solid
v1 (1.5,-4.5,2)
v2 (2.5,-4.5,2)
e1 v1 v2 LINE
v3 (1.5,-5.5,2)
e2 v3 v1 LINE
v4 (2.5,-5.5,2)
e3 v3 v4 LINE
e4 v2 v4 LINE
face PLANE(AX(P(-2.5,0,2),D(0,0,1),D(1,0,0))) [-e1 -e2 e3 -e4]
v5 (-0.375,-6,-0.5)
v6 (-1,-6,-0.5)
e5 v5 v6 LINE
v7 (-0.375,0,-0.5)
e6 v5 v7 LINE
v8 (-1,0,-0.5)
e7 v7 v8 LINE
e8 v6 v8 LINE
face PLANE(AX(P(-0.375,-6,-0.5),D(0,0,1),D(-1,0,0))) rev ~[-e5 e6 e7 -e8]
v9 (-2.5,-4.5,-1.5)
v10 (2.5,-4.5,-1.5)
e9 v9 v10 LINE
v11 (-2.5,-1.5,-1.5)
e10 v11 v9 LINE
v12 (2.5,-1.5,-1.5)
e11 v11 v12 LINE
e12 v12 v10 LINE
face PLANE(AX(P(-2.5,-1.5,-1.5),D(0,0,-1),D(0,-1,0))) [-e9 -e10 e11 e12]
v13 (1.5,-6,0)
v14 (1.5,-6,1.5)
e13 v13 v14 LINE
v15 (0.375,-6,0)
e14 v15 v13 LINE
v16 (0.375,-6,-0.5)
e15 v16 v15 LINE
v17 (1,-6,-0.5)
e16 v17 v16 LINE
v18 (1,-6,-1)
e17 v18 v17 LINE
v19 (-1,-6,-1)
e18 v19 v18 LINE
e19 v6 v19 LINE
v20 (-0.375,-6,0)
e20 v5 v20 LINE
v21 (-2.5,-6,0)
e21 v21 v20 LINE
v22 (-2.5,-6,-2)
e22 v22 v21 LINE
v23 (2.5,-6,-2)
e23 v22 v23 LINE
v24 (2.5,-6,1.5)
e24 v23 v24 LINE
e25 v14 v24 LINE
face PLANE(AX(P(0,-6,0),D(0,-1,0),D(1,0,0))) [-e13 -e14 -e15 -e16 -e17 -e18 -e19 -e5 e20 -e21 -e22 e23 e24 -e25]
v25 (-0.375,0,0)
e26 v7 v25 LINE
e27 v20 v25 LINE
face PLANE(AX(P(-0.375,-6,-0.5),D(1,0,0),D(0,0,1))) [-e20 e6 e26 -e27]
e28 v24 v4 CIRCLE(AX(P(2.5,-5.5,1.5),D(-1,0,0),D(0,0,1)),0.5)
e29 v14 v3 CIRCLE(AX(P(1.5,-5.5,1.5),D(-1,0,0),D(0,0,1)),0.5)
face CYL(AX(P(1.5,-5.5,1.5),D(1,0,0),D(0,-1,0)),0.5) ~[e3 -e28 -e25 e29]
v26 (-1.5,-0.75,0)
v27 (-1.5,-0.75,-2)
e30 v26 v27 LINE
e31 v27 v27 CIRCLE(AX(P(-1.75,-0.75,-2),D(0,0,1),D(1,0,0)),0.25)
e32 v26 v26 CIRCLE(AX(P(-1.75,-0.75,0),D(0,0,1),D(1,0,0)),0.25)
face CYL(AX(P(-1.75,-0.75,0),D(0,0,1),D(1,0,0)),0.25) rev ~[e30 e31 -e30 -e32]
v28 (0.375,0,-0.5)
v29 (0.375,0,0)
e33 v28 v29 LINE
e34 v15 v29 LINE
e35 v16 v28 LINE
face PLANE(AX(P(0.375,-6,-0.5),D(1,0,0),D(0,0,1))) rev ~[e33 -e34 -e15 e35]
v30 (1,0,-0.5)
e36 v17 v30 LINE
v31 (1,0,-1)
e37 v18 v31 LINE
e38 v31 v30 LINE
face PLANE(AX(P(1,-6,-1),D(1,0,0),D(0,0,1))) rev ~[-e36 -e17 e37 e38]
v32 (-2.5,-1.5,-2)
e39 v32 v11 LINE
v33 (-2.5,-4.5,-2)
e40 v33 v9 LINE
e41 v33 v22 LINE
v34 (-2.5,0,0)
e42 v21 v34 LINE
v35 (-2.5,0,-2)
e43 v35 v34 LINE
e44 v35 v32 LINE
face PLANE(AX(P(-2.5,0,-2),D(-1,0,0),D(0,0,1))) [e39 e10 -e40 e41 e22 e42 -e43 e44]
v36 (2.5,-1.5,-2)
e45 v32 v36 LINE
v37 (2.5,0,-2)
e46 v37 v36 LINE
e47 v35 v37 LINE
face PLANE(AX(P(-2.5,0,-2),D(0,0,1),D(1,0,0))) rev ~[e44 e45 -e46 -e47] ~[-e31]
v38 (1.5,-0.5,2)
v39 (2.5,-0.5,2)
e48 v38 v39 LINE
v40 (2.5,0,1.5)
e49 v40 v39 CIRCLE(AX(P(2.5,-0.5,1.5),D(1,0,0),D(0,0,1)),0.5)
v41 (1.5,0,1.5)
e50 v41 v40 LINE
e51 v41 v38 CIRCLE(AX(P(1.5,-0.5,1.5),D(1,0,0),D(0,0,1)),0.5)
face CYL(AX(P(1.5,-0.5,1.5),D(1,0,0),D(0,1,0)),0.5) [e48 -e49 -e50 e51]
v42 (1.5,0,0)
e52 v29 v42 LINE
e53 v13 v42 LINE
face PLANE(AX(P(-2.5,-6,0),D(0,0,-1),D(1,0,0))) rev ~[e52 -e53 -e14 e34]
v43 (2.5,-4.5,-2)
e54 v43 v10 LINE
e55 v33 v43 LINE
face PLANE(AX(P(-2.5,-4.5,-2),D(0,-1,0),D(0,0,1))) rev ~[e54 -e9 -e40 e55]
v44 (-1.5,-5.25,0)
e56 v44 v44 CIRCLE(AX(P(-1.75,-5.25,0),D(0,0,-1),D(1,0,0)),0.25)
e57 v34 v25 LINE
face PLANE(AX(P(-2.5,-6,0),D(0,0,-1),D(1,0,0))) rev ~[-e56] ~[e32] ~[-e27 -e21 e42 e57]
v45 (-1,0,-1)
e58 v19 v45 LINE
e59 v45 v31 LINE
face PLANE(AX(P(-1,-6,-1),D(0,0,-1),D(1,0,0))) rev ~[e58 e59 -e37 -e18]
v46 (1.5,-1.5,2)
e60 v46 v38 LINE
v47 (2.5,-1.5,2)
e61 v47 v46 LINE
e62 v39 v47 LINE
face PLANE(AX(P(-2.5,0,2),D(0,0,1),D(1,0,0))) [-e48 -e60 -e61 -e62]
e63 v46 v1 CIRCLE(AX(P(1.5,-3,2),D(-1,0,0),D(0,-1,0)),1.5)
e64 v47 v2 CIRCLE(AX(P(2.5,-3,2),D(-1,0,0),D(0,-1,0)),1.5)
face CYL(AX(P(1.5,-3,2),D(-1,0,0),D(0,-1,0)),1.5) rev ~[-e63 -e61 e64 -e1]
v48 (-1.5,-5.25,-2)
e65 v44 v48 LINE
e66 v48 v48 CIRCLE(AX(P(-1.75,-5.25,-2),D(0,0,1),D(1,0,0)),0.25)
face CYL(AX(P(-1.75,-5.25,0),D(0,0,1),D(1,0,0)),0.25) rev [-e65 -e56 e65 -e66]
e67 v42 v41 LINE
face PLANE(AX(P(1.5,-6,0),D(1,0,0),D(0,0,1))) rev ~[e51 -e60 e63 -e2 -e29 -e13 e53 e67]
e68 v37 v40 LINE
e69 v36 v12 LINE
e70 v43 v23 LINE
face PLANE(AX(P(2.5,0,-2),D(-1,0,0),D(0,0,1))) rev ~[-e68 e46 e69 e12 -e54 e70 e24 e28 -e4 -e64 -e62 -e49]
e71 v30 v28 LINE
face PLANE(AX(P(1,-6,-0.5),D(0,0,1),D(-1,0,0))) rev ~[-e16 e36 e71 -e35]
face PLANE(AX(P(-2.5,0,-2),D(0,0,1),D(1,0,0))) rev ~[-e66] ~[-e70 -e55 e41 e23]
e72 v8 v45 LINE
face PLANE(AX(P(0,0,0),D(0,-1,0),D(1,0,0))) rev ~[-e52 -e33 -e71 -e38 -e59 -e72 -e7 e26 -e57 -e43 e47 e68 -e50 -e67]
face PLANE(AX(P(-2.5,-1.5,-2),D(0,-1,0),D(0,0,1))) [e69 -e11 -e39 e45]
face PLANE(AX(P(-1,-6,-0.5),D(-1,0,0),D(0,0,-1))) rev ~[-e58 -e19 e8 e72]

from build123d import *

# Parameters (mm, degrees)
F0_W      = 5
F0_H      = 4
F1_DEPTH  = 6
F2_W      = 4
F2_H      = 2
F3_DEPTH  = 6.001
F4_W      = 0.75
F4_H      = 0.5
F5_DEPTH  = 6.001
F6_W      = 3
F6_H      = 0.5
F7_DEPTH  = 5.001
F8_R      = 1.5
F9_DEPTH  = 1.001
F10_R     = 0.5
F11_R     = 0.25
F12_DEPTH = 2.001


# Not quite as in the source:
# - a pattern or mirror of a feature is missing from the dataset's text; its kind, count and spacing are read off the source's solid


with BuildPart() as f1:
    # F0 (on Front) → F1 (new body)
    with BuildSketch(Plane.XZ):
        Rectangle(F0_W, F0_H)
    extrude(amount=F1_DEPTH)

    # F2 (on face) → F3 (cut, through all)
    with BuildSketch(Plane.XZ.offset(6)):
        with Locations((-0.5, 1)):
            Rectangle(F2_W, F2_H)
    extrude(amount=-F3_DEPTH, mode=Mode.SUBTRACT)

    # F4 (on face) → F5 (cut, through all)
    with BuildSketch(Plane.XZ.offset(6)):
        with Locations((0, -0.25)):
            Rectangle(F4_W, F4_H)
        Polygon((1, -0.5), (0.375, -0.5), (-0.375, -0.5), (-1, -0.5), (-1, -1), (1, -1), align=None)
    extrude(amount=-F5_DEPTH, mode=Mode.SUBTRACT)

    # F6 (on face) → F7 (cut, through all)
    with BuildSketch(Plane(origin=(-2.5, 0, 0), x_dir=(0, -1, 0), z_dir=(-1, 0, 0))):
        with Locations((3, -1.75)):
            Rectangle(F6_W, F6_H)
    extrude(amount=-F7_DEPTH, mode=Mode.SUBTRACT)

    # F8 (on face) → F9 (cut, through all)
    with BuildSketch(Plane(origin=(1.5, 0, 0), x_dir=(0, -1, 0), z_dir=(-1, 0, 0))):
        with Locations((3, 2)):
            Circle(F8_R)
    extrude(amount=-F9_DEPTH, mode=Mode.SUBTRACT)

    # F10
    f10_edges = [f1.edges().sort_by_distance(p)[0] for p in [
        (2, -6, 2),
        (2, 0, 2),
    ]]
    fillet(f10_edges, radius=F10_R)

    # F11 (on face) → F12 (cut, through all)
    with BuildSketch(Plane.XY):
        with Locations((-1.75, -0.75)):
            Circle(F11_R)
    f12 = extrude(amount=-F12_DEPTH, mode=Mode.SUBTRACT)

    # F12_copies: F12 across plane
    add(f12.mirror(Plane(origin=(0, -3, 0), x_dir=(0, 0, -1), z_dir=(0, -1, 0))), mode=Mode.SUBTRACT)


solid = f1.part
